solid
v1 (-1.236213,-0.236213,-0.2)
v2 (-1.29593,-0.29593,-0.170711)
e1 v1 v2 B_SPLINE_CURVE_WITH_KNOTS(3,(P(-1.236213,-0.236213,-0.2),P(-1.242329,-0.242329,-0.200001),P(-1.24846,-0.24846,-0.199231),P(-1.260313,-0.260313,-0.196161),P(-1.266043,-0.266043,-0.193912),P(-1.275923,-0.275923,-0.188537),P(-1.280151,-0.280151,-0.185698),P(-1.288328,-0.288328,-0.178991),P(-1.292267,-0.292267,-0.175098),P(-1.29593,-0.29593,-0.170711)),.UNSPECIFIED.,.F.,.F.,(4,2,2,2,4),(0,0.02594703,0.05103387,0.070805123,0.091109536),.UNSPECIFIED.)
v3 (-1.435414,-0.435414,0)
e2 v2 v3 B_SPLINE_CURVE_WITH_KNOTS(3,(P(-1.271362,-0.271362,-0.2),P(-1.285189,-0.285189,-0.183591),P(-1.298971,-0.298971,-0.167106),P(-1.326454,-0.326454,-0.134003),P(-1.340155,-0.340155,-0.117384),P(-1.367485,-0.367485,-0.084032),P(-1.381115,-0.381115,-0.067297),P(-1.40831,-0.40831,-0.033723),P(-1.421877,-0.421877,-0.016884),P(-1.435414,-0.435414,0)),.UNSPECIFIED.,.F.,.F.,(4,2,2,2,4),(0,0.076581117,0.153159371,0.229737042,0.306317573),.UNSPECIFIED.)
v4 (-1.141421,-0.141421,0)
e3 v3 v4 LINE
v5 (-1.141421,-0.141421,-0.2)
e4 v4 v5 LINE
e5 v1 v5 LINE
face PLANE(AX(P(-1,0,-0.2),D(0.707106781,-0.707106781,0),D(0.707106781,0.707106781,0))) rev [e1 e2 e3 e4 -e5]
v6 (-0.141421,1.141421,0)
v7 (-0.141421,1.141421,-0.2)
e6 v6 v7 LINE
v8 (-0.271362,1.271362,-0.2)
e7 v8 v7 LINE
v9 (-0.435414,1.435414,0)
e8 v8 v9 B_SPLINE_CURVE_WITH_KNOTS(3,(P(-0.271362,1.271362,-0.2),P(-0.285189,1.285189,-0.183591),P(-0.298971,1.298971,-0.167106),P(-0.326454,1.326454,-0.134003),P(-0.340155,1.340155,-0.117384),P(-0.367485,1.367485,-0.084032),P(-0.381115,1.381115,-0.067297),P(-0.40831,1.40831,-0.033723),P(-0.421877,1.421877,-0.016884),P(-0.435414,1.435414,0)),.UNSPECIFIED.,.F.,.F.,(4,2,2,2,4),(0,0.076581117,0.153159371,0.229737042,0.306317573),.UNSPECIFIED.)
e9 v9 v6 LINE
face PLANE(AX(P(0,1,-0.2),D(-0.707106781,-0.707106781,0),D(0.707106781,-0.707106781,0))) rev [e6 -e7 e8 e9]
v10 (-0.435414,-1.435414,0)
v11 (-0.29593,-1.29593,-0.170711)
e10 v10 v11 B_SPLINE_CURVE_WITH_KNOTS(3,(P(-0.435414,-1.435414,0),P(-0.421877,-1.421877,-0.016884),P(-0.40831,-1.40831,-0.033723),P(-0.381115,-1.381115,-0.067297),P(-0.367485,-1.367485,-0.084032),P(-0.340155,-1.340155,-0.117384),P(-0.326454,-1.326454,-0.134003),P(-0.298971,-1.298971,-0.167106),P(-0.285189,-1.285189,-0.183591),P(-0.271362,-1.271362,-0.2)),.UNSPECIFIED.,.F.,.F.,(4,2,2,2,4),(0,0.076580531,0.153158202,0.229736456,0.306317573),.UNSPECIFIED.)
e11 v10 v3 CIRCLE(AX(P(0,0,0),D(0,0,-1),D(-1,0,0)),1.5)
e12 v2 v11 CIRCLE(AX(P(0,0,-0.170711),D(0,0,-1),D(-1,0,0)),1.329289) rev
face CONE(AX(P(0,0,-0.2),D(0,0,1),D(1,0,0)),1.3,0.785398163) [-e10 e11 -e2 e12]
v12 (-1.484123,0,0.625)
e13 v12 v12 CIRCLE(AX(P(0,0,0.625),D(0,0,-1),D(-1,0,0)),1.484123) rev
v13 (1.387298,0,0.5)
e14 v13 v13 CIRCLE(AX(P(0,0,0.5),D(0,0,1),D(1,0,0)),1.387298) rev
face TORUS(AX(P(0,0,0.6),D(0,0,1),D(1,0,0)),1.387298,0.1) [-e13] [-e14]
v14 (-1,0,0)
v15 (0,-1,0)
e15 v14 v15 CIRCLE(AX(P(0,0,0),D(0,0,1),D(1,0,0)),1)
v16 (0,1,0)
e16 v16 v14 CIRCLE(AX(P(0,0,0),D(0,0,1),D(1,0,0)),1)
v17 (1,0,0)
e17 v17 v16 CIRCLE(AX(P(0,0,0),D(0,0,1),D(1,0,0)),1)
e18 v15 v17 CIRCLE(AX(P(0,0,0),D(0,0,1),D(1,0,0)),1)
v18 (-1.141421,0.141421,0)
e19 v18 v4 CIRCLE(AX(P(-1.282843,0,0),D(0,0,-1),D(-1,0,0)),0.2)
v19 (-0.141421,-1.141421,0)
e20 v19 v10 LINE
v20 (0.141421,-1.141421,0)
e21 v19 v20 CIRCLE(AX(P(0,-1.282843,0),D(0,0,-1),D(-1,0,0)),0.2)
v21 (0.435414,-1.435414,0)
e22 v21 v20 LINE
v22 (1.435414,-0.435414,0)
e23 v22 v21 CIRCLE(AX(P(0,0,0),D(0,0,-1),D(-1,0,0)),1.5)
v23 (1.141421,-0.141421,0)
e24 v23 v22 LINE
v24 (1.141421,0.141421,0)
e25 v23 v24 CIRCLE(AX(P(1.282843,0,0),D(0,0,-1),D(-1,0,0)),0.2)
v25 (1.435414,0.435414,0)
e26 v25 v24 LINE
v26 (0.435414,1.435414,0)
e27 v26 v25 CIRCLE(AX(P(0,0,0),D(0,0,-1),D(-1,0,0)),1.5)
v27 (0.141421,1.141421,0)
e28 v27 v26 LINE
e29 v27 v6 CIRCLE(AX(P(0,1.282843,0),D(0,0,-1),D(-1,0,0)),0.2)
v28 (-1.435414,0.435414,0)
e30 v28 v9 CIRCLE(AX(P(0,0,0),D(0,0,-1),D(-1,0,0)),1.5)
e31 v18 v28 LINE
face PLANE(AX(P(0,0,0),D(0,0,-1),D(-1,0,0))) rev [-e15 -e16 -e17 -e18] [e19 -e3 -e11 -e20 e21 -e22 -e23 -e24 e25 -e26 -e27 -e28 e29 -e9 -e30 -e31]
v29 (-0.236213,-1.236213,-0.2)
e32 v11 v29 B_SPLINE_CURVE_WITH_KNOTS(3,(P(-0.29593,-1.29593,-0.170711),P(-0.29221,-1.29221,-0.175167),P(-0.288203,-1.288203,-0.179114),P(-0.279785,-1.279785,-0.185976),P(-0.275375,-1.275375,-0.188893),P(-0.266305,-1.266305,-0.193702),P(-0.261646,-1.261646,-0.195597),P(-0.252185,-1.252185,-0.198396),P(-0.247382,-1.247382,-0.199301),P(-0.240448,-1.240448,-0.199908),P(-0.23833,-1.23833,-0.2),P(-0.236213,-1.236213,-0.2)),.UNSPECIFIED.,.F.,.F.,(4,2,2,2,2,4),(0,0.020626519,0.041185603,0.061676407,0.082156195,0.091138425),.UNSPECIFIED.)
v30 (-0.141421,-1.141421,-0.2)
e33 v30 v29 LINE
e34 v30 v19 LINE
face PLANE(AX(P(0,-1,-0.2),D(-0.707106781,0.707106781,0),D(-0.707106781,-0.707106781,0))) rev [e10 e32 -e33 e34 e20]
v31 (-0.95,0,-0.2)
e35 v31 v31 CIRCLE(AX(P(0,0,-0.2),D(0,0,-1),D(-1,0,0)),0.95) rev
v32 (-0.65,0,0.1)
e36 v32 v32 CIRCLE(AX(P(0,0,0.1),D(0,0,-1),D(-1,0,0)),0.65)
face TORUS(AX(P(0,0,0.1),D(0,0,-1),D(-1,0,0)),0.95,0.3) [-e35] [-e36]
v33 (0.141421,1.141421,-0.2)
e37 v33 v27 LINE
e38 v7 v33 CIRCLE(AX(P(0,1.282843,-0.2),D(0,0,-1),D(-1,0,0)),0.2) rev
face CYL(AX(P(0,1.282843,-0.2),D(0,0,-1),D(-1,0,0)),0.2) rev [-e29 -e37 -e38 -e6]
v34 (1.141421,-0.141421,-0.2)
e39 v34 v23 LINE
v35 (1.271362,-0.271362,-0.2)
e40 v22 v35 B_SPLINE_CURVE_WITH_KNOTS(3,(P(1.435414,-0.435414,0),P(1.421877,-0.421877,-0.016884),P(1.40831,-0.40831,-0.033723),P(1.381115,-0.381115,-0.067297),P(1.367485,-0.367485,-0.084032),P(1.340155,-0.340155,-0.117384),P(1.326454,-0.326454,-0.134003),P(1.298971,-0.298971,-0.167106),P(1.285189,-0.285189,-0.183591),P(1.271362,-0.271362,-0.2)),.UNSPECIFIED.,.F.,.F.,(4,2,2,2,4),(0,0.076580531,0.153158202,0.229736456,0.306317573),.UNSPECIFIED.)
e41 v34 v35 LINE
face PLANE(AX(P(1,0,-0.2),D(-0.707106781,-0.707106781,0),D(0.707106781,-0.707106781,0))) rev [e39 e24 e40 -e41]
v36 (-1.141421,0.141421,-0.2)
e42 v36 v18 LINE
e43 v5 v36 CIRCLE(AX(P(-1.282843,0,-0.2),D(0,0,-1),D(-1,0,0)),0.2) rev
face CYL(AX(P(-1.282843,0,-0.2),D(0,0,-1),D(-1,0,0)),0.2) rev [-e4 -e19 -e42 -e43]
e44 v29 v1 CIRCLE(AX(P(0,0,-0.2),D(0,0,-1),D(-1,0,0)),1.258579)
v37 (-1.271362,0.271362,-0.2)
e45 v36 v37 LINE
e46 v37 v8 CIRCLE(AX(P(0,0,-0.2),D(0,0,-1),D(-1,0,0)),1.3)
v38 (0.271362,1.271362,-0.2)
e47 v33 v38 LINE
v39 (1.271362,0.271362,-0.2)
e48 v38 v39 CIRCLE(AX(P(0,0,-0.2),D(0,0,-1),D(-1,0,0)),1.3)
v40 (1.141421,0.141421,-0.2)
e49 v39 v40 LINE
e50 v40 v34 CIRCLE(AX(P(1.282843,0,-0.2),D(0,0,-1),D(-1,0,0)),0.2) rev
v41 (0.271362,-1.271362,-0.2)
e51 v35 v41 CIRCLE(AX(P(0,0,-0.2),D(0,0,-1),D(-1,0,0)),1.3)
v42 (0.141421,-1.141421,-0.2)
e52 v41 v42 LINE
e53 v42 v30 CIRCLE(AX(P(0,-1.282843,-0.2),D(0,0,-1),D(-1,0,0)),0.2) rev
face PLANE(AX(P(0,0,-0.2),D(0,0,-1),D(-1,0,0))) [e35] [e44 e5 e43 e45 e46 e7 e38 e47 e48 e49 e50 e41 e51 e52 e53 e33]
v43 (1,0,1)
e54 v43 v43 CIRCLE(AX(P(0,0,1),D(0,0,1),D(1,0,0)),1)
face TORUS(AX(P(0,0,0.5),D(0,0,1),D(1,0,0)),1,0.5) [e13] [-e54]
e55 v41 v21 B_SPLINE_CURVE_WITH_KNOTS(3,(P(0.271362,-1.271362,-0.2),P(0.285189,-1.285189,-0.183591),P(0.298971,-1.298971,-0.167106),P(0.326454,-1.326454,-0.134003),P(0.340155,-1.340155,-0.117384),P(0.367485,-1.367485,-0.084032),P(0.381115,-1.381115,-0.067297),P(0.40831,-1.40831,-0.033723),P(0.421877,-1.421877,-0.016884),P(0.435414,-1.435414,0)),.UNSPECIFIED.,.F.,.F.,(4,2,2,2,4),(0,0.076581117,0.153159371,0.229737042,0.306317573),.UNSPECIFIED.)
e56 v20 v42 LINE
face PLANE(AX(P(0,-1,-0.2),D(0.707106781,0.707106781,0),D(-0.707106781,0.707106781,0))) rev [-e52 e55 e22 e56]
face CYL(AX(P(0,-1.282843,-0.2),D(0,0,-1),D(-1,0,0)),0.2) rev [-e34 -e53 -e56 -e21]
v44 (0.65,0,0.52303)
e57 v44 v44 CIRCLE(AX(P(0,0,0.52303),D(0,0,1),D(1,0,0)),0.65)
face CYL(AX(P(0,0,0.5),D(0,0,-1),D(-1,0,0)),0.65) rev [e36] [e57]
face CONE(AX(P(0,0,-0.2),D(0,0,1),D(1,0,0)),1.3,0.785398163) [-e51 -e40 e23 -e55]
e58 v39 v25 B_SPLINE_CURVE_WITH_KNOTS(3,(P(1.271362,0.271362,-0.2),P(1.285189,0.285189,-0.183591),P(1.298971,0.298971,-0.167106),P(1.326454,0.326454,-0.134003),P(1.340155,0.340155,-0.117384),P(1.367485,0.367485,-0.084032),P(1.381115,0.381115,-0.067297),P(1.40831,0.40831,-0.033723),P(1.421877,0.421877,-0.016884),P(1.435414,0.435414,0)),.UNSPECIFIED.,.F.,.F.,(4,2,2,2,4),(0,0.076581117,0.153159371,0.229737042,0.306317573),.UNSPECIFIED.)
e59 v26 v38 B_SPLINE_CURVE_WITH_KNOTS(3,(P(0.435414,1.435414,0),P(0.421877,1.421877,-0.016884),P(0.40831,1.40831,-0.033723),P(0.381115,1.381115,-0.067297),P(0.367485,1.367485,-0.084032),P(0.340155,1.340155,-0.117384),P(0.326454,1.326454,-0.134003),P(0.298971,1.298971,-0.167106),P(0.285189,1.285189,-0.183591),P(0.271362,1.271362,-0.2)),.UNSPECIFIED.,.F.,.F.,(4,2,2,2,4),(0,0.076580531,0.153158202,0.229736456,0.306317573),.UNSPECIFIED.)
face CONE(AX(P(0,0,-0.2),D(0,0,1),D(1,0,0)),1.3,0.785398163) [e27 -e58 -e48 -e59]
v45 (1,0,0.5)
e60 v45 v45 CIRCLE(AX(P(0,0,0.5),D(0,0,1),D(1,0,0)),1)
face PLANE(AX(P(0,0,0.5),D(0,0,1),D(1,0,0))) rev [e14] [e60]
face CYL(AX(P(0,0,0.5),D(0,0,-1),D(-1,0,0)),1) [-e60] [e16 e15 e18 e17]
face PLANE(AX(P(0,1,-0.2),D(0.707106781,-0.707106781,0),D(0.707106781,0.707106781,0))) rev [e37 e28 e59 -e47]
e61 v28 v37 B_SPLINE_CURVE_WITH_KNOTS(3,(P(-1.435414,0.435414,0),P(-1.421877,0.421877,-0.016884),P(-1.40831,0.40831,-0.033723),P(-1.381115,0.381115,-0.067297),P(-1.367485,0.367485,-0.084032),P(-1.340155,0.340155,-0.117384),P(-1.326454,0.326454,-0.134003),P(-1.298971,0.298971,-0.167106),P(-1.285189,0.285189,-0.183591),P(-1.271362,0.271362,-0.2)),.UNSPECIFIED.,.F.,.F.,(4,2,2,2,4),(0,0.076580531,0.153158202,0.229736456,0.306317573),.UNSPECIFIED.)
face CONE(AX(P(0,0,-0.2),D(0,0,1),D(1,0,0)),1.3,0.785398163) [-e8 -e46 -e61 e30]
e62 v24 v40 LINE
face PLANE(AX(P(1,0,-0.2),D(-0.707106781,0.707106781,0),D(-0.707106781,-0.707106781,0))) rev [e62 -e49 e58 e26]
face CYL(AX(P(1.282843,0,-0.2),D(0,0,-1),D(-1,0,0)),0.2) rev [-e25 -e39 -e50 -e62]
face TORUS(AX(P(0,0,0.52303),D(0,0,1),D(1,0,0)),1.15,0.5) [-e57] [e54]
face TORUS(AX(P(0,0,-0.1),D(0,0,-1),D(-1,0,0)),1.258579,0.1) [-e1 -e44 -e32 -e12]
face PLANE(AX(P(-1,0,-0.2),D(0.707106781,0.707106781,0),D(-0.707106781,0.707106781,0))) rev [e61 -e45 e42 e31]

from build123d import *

# Parameters (mm, degrees)
SKETCH1_R           = 1
SKETCH1_R_2         = 0.65
BOSS_EXTRUDE1_DEPTH = 0.5
SKETCH3_R           = 1.5
SKETCH3_R_2         = 0.65
BOSS_EXTRUDE4_DEPTH = 0.5
BOSS_EXTRUDE5_START = 0.2
SKETCH4_R           = 0.65
BOSS_EXTRUDE5_DEPTH = 0.2
FILLET4_R           = 0.5
FILLET5_R           = 0.5
FILLET6_R           = 0.1
CHAMFER2_SIZE       = 0.2
FILLET8_R           = 0.2
FILLET9_R           = 0.1
FILLET10_R          = 0.3


# Some blends are built 0.0001 mm under size
with BuildPart() as part:
    # Sketch1 → Boss-Extrude1 (new body)
    with BuildSketch(Plane.XY):
        Circle(SKETCH1_R)
        Circle(SKETCH1_R_2, mode=Mode.SUBTRACT)
    extrude(amount=BOSS_EXTRUDE1_DEPTH)

    # Sketch3 → Boss-Extrude4 (add)
    with BuildSketch(Plane.XY.offset(0.5)):
        Circle(SKETCH3_R)
        Circle(SKETCH3_R_2, mode=Mode.SUBTRACT)
    extrude(amount=BOSS_EXTRUDE4_DEPTH)

    # Sketch4 → Boss-Extrude5 (add)
    with BuildSketch(Plane(origin=(0, 0, 0), x_dir=(-1, 0, 0), z_dir=(0, 0, -1)).offset(BOSS_EXTRUDE5_START)):
        with BuildLine():
            Line((0, 1), (-0.435414347, 1.435414347))
            ThreePointArc((-0.435414347, 1.435414347), (-1.060660172, 1.060660172), (-1.435414347, 0.435414347))
            Line((-1.435414347, 0.435414347), (-1, 0))
            Line((-1, 0), (-1.435414347, -0.435414347))
            ThreePointArc((-1.435414347, -0.435414347), (-1.060660172, -1.060660172), (-0.435414347, -1.435414347))
            Line((-0.435414347, -1.435414347), (0, -1))
            Line((0, -1), (0.435414347, -1.435414347))
            ThreePointArc((0.435414347, -1.435414347), (1.060660172, -1.060660172), (1.435414347, -0.435414347))
            Line((1.435414347, -0.435414347), (1, 0))
            Line((1, 0), (1.435414347, 0.435414347))
            ThreePointArc((1.435414347, 0.435414347), (1.060660172, 1.060660172), (0.435414347, 1.435414347))
            Line((0.435414347, 1.435414347), (0, 1))
        make_face()
        Circle(SKETCH4_R, mode=Mode.SUBTRACT)
    extrude(amount=-BOSS_EXTRUDE5_DEPTH)

    # Fillet4
    fillet4_edges = [part.edges().sort_by_distance(p)[0] for p in [
        (-1.5, 0, 1),
    ]]
    fillet(fillet4_edges, radius=FILLET4_R - 0.0001)  # a hair under: the kernel refuses the full size

    # Fillet5
    # the kernel refuses this fillet: 0.5 mm, written as the material it takes off along each edge
    with BuildSketch(Plane(origin=(0, 0, 1), x_dir=(1, 0, 0), z_dir=(0, -1, 0))) as fillet5_piece_1:
        with BuildLine():
            CenterArc((1.15, -0.477001038), FILLET5_R, 107.44559106, 72.55440894)
            Line((0.65, -0.477001038), (0.64, -0.477001038))
            Line((0.64, -0.477001038), (0.64, 0))
            Line((0.64, 0), (0.65, 0.01))
            ThreePointArc((0.65, 0.01), (0.82505, 0.01), (0.997102, 0.009540021))
            Line((0.997102, 0.009540021), (1.0001, 0))
        make_face()
    revolve(axis=Axis((0, 0, 1), (0, 0, 1)), mode=Mode.SUBTRACT)

    # Fillet6
    fillet6_edges = [part.edges().sort_by_distance(p)[0] for p in [
        (-1.5, 0, 0.5),
    ]]
    fillet(fillet6_edges, radius=FILLET6_R)

    # Chamfer2
    chamfer2_edges = [part.edges().sort_by_distance(p)[0] for p in [
        (-1.060660172, -1.060660172, -0.2),
        (-1.060660172, 1.060660172, -0.2),
        (1.060660172, 1.060660172, -0.2),
        (1.060660172, -1.060660172, -0.2),
    ]]
    chamfer(chamfer2_edges, length=CHAMFER2_SIZE - 0.0001)  # a hair under: the kernel refuses the full size

    # Fillet8
    # the kernel refuses this fillet: 0.2 mm, written as the material it adds along each edge
    with BuildSketch(Plane(origin=(0, 1, -0.2), x_dir=(-0.7071067811865487, 0.7071067811865465, 0), z_dir=(0, 0, 1)), Plane(origin=(-1, 0, -0.2), x_dir=(-0.7071067811865464, -0.7071067811865487, 0), z_dir=(0, 0, 1))) as fillet8_piece_1:
        with BuildLine():
            CenterArc((FILLET8_R, -FILLET8_R), FILLET8_R, 90, 90)
            Line((0, -FILLET8_R), (0, 0))
            Line((0, 0), (FILLET8_R, 0))
        make_face()
    extrude(amount=0.2)
    with BuildSketch(Plane(origin=(1, 0, -0.2), x_dir=(0.707106781186541, -0.707106781186554, 0), z_dir=(0, 0, 1)), Plane(origin=(0, -1, -0.2), x_dir=(-0.707106781186554, -0.707106781186541, 0), z_dir=(0, 0, 1))) as fillet8_piece_2:
        with BuildLine():
            CenterArc((FILLET8_R, FILLET8_R), FILLET8_R, 180, 90)
            Line((0, FILLET8_R), (0, 0))
            Line((0, 0), (FILLET8_R, 0))
        make_face()
    extrude(amount=0.2)

    # Fillet9
    fillet9_edges = [part.edges().sort_by_distance(p)[0] for p in [
        (-0.919309526, -0.919309526, -0.2),
    ]]
    fillet(fillet9_edges, radius=FILLET9_R)

    # Fillet10
    # the kernel refuses this fillet: 0.3 mm, written as the material it takes off along each edge
    with BuildSketch(Plane(origin=(0, 0, -0.2), x_dir=(-1, 0, 0), z_dir=(0, -1, 0))) as fillet10_piece_1:
        with BuildLine():
            CenterArc((0.65 + FILLET10_R, -FILLET10_R), FILLET10_R, 90, 90)
            Line((0.65, -FILLET10_R), (0.65, 0))
            Line((0.65, 0), (0.65 + FILLET10_R, 0))
        make_face()
    revolve(axis=Axis((0, 0, -0.2), (0, 0, -1)), mode=Mode.SUBTRACT)


solid = part.part
